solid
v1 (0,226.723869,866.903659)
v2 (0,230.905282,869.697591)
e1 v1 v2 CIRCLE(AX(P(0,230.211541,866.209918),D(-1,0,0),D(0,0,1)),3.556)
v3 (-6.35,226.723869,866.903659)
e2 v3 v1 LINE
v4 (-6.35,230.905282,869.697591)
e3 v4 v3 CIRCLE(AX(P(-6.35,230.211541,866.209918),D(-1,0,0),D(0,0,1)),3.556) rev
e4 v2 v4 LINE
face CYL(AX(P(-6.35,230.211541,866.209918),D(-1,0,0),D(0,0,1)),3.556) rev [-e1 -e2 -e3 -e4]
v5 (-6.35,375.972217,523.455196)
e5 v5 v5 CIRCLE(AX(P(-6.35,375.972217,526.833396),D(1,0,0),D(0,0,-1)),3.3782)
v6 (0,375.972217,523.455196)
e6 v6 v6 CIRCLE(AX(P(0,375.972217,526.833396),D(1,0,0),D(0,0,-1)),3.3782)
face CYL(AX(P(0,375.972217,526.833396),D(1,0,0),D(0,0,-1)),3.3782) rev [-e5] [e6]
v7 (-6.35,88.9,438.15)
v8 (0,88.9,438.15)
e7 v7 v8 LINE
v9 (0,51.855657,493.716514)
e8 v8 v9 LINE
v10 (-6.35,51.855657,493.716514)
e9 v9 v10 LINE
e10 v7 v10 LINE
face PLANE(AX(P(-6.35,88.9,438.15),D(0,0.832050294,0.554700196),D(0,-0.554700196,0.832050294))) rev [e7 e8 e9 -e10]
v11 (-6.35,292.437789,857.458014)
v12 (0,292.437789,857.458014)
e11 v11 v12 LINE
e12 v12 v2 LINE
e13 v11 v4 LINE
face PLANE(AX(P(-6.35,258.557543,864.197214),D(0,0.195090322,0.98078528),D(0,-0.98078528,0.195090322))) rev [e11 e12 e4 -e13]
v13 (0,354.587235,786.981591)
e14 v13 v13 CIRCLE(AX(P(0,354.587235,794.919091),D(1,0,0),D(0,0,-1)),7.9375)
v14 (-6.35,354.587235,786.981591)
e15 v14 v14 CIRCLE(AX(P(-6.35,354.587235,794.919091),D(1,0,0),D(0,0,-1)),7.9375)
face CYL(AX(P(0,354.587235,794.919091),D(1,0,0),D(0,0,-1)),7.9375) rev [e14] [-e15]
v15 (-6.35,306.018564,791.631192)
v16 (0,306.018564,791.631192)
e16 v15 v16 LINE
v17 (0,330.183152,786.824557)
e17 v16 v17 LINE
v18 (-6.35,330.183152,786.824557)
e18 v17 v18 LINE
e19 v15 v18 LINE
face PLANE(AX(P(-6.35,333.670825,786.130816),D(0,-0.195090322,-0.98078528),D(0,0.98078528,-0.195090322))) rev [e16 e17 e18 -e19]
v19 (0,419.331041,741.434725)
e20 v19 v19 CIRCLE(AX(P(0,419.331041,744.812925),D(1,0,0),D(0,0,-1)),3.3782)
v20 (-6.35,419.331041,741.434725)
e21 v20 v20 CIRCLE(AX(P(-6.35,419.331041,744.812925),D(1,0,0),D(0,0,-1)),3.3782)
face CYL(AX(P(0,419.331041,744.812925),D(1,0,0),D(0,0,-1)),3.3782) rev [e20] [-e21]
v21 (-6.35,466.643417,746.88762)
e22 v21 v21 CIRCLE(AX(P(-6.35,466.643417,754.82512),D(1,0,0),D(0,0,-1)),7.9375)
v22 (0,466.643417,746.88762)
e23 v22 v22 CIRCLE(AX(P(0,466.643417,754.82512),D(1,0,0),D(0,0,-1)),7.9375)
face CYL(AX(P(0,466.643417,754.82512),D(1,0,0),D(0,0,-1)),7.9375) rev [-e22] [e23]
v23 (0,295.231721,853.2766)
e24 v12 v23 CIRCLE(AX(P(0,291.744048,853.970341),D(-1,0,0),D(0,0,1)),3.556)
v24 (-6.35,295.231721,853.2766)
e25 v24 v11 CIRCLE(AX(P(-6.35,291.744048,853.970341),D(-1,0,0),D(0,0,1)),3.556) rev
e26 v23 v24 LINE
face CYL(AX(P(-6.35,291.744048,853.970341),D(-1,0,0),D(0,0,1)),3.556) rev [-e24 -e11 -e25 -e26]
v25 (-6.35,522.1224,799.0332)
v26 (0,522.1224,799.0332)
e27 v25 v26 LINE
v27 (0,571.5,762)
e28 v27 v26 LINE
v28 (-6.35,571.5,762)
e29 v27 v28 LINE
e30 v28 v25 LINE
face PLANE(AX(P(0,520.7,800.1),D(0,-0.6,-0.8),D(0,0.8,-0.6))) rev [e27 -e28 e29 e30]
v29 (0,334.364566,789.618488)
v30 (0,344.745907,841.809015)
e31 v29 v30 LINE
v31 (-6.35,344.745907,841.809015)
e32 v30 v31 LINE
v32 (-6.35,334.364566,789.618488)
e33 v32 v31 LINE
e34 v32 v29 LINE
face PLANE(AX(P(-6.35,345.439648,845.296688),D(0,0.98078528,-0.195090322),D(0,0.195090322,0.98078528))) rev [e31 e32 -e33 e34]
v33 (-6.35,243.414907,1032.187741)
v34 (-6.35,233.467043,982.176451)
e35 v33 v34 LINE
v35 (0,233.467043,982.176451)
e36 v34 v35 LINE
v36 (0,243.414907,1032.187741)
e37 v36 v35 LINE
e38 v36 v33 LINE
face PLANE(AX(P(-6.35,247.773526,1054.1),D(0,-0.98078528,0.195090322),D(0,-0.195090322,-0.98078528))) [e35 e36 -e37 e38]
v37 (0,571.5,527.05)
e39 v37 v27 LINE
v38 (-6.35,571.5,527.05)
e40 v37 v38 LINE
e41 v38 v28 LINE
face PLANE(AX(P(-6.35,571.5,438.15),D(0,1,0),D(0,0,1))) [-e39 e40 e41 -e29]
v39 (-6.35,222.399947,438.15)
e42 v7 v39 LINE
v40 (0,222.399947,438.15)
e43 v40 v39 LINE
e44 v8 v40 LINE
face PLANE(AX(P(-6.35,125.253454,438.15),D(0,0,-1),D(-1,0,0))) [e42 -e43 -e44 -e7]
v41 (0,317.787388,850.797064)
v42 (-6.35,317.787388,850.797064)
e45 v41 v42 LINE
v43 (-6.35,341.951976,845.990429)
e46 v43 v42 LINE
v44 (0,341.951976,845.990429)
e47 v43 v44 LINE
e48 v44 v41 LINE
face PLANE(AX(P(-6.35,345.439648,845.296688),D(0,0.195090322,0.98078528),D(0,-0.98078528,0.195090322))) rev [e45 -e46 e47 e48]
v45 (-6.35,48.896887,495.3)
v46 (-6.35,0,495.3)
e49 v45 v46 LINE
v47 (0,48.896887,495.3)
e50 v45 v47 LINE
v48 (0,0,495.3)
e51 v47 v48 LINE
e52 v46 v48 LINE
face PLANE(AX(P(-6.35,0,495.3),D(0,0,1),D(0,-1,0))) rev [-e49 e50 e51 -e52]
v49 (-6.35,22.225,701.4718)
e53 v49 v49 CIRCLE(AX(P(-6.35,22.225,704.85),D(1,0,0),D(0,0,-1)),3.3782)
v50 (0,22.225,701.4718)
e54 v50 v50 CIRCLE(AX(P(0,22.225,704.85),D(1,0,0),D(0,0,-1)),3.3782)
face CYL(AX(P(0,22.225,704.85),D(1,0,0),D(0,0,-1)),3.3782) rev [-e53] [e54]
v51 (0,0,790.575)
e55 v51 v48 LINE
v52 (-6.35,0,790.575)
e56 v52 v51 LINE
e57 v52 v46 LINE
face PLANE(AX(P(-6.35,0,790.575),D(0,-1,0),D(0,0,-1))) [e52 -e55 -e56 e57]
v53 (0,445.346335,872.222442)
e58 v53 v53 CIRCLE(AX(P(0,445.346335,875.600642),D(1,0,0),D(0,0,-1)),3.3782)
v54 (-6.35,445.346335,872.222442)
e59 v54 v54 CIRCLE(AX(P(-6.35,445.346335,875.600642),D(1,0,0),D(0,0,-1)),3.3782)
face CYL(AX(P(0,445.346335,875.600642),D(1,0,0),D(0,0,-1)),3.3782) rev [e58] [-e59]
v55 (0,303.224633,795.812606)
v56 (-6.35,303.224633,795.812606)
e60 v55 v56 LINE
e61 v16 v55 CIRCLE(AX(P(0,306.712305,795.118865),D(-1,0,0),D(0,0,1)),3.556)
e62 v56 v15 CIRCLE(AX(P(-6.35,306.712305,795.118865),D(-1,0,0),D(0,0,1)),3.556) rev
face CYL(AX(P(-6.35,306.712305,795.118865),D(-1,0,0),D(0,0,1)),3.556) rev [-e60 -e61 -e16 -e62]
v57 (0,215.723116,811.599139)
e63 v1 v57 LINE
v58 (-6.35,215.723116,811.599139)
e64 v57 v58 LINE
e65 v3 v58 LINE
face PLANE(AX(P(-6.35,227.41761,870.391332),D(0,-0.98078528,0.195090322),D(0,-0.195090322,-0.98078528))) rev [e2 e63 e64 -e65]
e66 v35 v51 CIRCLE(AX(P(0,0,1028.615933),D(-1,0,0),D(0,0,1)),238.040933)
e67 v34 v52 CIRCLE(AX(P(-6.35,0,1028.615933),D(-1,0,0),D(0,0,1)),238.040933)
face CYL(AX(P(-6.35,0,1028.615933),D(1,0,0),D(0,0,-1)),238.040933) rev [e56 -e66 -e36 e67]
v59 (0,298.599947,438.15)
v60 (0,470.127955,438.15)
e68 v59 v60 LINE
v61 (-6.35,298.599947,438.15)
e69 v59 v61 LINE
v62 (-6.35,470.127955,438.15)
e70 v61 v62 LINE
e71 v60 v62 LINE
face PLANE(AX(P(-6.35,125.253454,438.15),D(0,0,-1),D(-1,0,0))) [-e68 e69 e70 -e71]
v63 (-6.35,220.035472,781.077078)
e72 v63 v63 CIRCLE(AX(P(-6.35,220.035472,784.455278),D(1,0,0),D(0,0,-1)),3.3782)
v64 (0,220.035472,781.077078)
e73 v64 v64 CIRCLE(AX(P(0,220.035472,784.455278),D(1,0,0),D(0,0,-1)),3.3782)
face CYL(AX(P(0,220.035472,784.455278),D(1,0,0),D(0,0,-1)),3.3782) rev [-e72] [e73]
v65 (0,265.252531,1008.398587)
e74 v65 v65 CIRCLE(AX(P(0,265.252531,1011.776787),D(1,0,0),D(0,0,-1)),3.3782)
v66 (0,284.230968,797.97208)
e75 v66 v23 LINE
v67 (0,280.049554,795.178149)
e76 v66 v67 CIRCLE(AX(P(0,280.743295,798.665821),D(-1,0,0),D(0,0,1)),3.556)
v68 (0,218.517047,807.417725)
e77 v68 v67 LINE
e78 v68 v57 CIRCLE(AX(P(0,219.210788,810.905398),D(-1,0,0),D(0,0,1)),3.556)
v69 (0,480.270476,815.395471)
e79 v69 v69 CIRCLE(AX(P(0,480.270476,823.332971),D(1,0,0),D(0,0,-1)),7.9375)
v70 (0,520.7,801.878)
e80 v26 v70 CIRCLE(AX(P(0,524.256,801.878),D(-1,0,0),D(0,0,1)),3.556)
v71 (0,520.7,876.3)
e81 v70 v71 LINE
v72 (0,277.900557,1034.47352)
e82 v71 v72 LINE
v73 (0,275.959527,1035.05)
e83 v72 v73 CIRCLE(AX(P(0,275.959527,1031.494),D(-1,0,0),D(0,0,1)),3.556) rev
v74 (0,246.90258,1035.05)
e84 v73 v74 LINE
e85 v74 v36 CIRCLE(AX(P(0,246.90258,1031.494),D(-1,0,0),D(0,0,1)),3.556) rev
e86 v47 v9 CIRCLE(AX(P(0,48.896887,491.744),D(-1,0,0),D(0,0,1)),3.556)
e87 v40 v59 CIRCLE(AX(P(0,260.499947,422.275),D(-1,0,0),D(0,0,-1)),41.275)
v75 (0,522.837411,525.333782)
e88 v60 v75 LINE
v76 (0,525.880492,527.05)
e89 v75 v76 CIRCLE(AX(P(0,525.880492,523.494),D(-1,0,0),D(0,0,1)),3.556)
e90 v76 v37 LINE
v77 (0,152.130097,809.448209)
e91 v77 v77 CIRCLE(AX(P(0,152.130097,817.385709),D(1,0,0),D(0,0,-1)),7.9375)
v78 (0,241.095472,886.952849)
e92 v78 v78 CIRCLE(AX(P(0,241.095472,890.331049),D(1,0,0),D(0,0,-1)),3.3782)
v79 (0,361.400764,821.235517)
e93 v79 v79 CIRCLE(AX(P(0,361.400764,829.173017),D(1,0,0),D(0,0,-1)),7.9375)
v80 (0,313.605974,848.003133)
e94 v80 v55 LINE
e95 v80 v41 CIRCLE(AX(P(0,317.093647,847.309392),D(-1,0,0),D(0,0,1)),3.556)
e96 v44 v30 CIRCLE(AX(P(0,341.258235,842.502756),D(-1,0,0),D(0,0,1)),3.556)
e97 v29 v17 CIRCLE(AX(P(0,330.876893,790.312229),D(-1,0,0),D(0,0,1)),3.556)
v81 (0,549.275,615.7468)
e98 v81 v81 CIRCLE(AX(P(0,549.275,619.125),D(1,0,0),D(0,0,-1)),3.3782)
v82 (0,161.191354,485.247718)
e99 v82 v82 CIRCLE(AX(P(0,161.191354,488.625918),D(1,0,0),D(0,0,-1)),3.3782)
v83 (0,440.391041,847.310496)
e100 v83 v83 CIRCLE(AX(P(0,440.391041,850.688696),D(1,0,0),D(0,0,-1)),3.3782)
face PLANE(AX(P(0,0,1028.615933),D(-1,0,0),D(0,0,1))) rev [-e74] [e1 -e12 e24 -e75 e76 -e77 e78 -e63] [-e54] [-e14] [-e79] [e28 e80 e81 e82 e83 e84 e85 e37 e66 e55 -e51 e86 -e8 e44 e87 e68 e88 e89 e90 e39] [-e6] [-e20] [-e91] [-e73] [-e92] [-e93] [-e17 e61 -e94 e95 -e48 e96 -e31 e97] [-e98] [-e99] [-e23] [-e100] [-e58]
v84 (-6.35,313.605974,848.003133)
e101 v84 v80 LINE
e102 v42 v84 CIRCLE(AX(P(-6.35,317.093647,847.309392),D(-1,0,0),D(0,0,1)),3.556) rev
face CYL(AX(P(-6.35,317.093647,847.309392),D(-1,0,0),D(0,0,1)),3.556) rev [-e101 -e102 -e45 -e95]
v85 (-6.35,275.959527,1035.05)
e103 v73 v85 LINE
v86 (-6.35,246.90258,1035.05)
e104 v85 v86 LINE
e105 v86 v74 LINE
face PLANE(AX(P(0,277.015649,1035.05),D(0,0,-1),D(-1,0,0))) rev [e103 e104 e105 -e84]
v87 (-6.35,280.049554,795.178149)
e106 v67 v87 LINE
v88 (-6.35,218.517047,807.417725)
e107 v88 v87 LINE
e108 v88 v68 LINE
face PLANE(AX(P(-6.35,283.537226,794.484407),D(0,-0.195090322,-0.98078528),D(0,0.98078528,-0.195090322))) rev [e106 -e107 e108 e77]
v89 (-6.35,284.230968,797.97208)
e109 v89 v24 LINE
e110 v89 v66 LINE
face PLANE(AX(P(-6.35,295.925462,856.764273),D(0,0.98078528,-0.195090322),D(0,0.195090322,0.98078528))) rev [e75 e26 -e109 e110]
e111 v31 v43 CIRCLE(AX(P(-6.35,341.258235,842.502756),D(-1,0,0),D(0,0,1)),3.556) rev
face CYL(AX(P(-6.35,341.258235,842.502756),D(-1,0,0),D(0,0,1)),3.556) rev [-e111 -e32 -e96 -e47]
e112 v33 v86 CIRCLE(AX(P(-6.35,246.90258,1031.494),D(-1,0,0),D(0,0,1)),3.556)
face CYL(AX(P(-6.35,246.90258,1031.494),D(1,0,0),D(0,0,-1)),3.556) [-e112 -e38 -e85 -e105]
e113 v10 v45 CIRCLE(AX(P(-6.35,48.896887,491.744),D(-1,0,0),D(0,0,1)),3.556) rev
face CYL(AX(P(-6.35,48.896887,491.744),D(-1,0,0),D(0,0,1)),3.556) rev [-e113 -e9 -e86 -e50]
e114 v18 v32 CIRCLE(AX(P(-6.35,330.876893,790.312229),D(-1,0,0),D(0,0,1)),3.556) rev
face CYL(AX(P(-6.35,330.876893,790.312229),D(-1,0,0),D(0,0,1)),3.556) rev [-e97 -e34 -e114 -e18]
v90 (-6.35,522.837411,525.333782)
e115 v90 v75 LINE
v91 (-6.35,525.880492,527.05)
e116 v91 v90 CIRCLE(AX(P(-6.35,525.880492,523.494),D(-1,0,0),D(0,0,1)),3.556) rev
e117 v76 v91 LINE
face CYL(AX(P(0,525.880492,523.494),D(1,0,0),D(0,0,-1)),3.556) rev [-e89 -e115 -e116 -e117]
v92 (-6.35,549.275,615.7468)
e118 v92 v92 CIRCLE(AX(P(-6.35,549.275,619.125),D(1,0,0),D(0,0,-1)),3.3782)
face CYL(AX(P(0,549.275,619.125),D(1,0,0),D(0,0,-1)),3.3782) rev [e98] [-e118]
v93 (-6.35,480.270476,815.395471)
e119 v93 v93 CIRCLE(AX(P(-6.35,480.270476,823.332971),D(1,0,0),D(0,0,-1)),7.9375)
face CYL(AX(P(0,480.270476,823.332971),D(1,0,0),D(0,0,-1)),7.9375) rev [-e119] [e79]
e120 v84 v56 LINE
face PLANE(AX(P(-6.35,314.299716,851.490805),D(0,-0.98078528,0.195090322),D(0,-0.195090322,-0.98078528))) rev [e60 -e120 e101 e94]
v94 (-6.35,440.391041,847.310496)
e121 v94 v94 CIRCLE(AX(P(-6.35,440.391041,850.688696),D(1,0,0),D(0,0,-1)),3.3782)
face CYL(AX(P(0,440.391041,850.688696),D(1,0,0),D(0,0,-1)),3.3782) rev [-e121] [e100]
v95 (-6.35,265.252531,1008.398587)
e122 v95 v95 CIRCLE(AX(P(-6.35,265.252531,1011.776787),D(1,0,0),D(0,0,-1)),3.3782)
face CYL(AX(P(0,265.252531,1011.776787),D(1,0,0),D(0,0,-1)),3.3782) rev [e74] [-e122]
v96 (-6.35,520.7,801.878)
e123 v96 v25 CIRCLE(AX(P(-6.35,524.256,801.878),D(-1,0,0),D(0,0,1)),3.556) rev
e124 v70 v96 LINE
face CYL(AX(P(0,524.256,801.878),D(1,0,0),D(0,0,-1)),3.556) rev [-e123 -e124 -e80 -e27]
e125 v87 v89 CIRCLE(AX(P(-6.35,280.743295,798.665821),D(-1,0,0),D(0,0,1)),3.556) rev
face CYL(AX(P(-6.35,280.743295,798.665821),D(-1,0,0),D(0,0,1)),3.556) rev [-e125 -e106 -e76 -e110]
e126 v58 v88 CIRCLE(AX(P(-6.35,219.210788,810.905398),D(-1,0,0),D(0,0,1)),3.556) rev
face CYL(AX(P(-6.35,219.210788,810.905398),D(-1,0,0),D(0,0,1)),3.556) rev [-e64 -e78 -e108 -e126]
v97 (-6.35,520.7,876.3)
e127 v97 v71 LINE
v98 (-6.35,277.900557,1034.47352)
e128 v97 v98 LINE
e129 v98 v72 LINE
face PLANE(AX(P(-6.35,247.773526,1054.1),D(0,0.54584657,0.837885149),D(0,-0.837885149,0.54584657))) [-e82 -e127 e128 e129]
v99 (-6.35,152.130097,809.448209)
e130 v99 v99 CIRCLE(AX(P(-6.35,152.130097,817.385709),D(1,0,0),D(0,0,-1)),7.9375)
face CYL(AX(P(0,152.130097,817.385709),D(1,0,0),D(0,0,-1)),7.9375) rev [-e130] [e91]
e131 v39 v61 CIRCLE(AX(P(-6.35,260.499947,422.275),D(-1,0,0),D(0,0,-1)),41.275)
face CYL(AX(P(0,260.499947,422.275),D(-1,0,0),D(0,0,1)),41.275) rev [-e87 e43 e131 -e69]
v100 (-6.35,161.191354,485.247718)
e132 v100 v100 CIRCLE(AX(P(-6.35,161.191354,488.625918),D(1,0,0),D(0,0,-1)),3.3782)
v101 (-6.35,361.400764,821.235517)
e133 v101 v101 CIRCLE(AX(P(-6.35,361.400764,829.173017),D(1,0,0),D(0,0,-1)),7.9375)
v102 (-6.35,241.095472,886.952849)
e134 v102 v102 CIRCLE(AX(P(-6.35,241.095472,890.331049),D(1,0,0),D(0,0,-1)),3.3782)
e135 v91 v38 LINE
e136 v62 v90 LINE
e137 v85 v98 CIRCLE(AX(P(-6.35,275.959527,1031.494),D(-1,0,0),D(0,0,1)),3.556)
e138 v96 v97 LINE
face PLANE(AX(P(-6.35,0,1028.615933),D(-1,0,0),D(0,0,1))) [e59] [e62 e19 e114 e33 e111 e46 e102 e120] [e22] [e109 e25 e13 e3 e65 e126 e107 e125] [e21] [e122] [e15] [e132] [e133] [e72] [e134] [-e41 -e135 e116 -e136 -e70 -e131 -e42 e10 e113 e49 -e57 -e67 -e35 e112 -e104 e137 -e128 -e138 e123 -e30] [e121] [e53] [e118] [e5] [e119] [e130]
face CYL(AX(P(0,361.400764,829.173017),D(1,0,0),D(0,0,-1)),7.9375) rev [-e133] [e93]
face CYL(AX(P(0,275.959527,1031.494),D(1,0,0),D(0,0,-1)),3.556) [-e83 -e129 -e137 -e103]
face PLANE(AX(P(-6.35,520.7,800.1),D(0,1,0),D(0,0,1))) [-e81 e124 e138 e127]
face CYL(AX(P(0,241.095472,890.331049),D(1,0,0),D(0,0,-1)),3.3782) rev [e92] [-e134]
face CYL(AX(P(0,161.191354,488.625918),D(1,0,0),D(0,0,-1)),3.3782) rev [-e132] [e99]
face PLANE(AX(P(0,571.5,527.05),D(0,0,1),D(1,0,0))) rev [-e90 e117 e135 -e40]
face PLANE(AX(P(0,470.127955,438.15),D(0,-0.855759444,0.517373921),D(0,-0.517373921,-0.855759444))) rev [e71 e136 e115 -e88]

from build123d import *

# Parameters (mm, degrees)
BASE_FLANGE1_DEPTH               = 6.35
F_1_4_CLEARANCE_HOLE1_D          = 6.7564
CUT_EXTRUDE1_DEPTH               = 1200.074385724
F_27_32_0_84375_DIAMETER_HOLE1_D = 21.43125
CUT_EXTRUDE2_DEPTH               = 1200.074385724
CUT_EXTRUDE3_DEPTH               = 1200.074385724
CUT_EXTRUDE5_DEPTH               = 1200.074385724
CUT_EXTRUDE6_DEPTH               = 1183.362497291
CUT_EXTRUDE7_DEPTH               = 1183.362497291
CUT_EXTRUDE8_DEPTH               = 1183.362497291
F_5_8_0_625_DIAMETER_HOLE1_D     = 15.875
FILLET2_R                        = 3.556


# Sheet-metal steps are written as plain solids
with BuildPart() as part:
    # Sketch1 → Base-Flange1 (new body)
    with BuildSketch(Plane(origin=(0, 0, 0), x_dir=(0, 0, -1), z_dir=(1, 0, 0))):
        with BuildLine():
            Line((-1054.1, 247.773526455), (-876.3, 520.7))
            Line((-876.3, 520.7), (-800.1, 520.7))
            Line((-800.1, 520.7), (-800.1, 571.5))
            Line((-800.1, 571.5), (-438.15, 571.5))
            Line((-438.15, 571.5), (-438.15, 125.253453767))
            Line((-438.15, 125.253453767), (-438.15, 0))
            Line((-438.15, 0), (-790.575, 0))
            ThreePointArc((-790.575, 0), (-844.607803402, 151.01156908), (-982.176450511, 233.467042956))
            Line((-982.176450511, 233.467042956), (-1054.1, 247.773526455))
        make_face()
    extrude(amount=-BASE_FLANGE1_DEPTH)

    # 1/4 Clearance Hole1 (through all)
    with Locations(Plane(origin=(0, 0, 0), x_dir=(0, 0, -1), z_dir=(1, 0, 0))):
        with Locations((-704.85, 22.225), (-1011.776786637, 265.252531308), (-488.62591807, 161.191353545), (-875.60064198, 445.346335342), (-526.833396269, 375.972216833), (-850.688695858, 440.391041163), (-744.812924838, 419.331040901), (-890.331049291, 241.095472185), (-784.455278272, 220.035471923), (-619.125, 549.275)):
            Hole(F_1_4_CLEARANCE_HOLE1_D / 2)

    # Sketch11 → Cut-Extrude1 (cut, through all)
    with BuildSketch(Plane(origin=(0, 0, 0), x_dir=(0, 0, -1), z_dir=(1, 0, 0))):
        Polygon((-845.296687768, 345.439648176), (-786.130815728, 333.670824501), (-792.324933452, 302.530891848), (-851.490805492, 314.299715524), align=None)
    extrude(amount=-CUT_EXTRUDE1_DEPTH, mode=Mode.SUBTRACT)

    # 27/32 (0.84375) Diameter Hole1 (through all)
    with Locations(Plane(origin=(0, 0, 0), x_dir=(0, 0, -1), z_dir=(1, 0, 0))):
        with Locations((-849.855910604, 239.518870383), (-822.45276987, 234.068046786)):
            Hole(F_27_32_0_84375_DIAMETER_HOLE1_D / 2)

    # Sketch14 → Cut-Extrude2 (cut, through all)
    with BuildSketch(Plane(origin=(0, 0, 0), x_dir=(0, 0, -1), z_dir=(1, 0, 0))):
        Polygon((-864.197214028, 258.557542635), (-870.391331752, 227.417609982), (-808.111466446, 215.029374534), (-801.917348722, 246.169307187), (-794.484407453, 283.53722637), (-856.764272759, 295.925461818), align=None)
    extrude(amount=-CUT_EXTRUDE2_DEPTH, mode=Mode.SUBTRACT)

    # Sketch15 → Cut-Extrude3 (cut, through all)
    with BuildSketch(Plane(origin=(0, 0, 0), x_dir=(0, 0, -1), z_dir=(1, 0, 0))):
        Polygon((-438.15, 571.5), (-476.25, 571.5), (-476.25, 523.875), (-438.15, 501.877954744), align=None)
        Polygon((-438.15, 0), (-495.3, 0), (-495.3, 50.8), (-438.15, 88.9), align=None)
    extrude(amount=-CUT_EXTRUDE3_DEPTH, mode=Mode.SUBTRACT)

    # Sketch17 → Cut-Extrude5 (cut, through all)
    with BuildSketch(Plane.ZY.offset(6.35)):
        Polygon((1035.05, 277.01564862), (1035.05, 243.984245856), (1054.1, 247.773526455), align=None)
    extrude(amount=-CUT_EXTRUDE5_DEPTH, mode=Mode.SUBTRACT)

    # Sketch18 → Cut-Extrude6 (cut, through all)
    with BuildSketch(Plane.ZY.offset(6.35)):
        Polygon((476.25, 523.875), (438.15, 501.877954744), (438.15, 470.127954744), (527.05, 523.875), (527.05, 571.5), (476.25, 571.5), align=None)
    extrude(amount=-CUT_EXTRUDE6_DEPTH, mode=Mode.SUBTRACT)

    # Sketch20 → Cut-Extrude7 (cut, through all)
    with BuildSketch(Plane.ZY.offset(6.35)):
        with BuildLine():
            Line((438.15, 298.599947238), (438.15, 222.399947238))
            ThreePointArc((438.15, 222.399947238), (463.55, 260.499947238), (438.15, 298.599947238))
        make_face()
    extrude(amount=-CUT_EXTRUDE7_DEPTH, mode=Mode.SUBTRACT)

    # Sketch22 → Cut-Extrude8 (cut, through all)
    with BuildSketch(Plane.ZY.offset(6.35)):
        Polygon((800.1, 520.7), (762, 571.5), (800.1, 571.5), align=None)
    extrude(amount=-CUT_EXTRUDE8_DEPTH, mode=Mode.SUBTRACT)

    # 5/8 (0.625) Diameter Hole1 (through all)
    with Locations(Plane(origin=(0, 0, 0), x_dir=(0, 0, -1), z_dir=(1, 0, 0))):
        with Locations((-823.332971453, 480.270476242), (-754.825119616, 466.643417249), (-817.385708629, 152.130097456), (-829.173016653, 361.400764358), (-794.919090735, 354.587234862)):
            Hole(F_5_8_0_625_DIAMETER_HOLE1_D / 2)

    # Fillet2
    fillet2_edges = [part.edges().sort_by_distance(p)[0] for p in [
        (-3.175, 314.299715524, 851.490805492),
        (-3.175, 345.439648176, 845.296687768),
        (-3.175, 333.670824501, 786.130815728),
        (-3.175, 302.530891848, 792.324933452),
        (-3.175, 295.925461818, 856.764272759),
        (-3.175, 283.53722637, 794.484407453),
        (-3.175, 215.029374534, 808.111466446),
        (-3.175, 227.417609982, 870.391331752),
        (-3.175, 520.7, 800.1),
        (-3.175, 50.8, 495.3),
        (-3.175, 277.01564862, 1035.05),
        (-3.175, 243.984245856, 1035.05),
        (-3.175, 523.875, 527.05),
    ]]
    fillet(fillet2_edges, radius=FILLET2_R)


solid = part.part
